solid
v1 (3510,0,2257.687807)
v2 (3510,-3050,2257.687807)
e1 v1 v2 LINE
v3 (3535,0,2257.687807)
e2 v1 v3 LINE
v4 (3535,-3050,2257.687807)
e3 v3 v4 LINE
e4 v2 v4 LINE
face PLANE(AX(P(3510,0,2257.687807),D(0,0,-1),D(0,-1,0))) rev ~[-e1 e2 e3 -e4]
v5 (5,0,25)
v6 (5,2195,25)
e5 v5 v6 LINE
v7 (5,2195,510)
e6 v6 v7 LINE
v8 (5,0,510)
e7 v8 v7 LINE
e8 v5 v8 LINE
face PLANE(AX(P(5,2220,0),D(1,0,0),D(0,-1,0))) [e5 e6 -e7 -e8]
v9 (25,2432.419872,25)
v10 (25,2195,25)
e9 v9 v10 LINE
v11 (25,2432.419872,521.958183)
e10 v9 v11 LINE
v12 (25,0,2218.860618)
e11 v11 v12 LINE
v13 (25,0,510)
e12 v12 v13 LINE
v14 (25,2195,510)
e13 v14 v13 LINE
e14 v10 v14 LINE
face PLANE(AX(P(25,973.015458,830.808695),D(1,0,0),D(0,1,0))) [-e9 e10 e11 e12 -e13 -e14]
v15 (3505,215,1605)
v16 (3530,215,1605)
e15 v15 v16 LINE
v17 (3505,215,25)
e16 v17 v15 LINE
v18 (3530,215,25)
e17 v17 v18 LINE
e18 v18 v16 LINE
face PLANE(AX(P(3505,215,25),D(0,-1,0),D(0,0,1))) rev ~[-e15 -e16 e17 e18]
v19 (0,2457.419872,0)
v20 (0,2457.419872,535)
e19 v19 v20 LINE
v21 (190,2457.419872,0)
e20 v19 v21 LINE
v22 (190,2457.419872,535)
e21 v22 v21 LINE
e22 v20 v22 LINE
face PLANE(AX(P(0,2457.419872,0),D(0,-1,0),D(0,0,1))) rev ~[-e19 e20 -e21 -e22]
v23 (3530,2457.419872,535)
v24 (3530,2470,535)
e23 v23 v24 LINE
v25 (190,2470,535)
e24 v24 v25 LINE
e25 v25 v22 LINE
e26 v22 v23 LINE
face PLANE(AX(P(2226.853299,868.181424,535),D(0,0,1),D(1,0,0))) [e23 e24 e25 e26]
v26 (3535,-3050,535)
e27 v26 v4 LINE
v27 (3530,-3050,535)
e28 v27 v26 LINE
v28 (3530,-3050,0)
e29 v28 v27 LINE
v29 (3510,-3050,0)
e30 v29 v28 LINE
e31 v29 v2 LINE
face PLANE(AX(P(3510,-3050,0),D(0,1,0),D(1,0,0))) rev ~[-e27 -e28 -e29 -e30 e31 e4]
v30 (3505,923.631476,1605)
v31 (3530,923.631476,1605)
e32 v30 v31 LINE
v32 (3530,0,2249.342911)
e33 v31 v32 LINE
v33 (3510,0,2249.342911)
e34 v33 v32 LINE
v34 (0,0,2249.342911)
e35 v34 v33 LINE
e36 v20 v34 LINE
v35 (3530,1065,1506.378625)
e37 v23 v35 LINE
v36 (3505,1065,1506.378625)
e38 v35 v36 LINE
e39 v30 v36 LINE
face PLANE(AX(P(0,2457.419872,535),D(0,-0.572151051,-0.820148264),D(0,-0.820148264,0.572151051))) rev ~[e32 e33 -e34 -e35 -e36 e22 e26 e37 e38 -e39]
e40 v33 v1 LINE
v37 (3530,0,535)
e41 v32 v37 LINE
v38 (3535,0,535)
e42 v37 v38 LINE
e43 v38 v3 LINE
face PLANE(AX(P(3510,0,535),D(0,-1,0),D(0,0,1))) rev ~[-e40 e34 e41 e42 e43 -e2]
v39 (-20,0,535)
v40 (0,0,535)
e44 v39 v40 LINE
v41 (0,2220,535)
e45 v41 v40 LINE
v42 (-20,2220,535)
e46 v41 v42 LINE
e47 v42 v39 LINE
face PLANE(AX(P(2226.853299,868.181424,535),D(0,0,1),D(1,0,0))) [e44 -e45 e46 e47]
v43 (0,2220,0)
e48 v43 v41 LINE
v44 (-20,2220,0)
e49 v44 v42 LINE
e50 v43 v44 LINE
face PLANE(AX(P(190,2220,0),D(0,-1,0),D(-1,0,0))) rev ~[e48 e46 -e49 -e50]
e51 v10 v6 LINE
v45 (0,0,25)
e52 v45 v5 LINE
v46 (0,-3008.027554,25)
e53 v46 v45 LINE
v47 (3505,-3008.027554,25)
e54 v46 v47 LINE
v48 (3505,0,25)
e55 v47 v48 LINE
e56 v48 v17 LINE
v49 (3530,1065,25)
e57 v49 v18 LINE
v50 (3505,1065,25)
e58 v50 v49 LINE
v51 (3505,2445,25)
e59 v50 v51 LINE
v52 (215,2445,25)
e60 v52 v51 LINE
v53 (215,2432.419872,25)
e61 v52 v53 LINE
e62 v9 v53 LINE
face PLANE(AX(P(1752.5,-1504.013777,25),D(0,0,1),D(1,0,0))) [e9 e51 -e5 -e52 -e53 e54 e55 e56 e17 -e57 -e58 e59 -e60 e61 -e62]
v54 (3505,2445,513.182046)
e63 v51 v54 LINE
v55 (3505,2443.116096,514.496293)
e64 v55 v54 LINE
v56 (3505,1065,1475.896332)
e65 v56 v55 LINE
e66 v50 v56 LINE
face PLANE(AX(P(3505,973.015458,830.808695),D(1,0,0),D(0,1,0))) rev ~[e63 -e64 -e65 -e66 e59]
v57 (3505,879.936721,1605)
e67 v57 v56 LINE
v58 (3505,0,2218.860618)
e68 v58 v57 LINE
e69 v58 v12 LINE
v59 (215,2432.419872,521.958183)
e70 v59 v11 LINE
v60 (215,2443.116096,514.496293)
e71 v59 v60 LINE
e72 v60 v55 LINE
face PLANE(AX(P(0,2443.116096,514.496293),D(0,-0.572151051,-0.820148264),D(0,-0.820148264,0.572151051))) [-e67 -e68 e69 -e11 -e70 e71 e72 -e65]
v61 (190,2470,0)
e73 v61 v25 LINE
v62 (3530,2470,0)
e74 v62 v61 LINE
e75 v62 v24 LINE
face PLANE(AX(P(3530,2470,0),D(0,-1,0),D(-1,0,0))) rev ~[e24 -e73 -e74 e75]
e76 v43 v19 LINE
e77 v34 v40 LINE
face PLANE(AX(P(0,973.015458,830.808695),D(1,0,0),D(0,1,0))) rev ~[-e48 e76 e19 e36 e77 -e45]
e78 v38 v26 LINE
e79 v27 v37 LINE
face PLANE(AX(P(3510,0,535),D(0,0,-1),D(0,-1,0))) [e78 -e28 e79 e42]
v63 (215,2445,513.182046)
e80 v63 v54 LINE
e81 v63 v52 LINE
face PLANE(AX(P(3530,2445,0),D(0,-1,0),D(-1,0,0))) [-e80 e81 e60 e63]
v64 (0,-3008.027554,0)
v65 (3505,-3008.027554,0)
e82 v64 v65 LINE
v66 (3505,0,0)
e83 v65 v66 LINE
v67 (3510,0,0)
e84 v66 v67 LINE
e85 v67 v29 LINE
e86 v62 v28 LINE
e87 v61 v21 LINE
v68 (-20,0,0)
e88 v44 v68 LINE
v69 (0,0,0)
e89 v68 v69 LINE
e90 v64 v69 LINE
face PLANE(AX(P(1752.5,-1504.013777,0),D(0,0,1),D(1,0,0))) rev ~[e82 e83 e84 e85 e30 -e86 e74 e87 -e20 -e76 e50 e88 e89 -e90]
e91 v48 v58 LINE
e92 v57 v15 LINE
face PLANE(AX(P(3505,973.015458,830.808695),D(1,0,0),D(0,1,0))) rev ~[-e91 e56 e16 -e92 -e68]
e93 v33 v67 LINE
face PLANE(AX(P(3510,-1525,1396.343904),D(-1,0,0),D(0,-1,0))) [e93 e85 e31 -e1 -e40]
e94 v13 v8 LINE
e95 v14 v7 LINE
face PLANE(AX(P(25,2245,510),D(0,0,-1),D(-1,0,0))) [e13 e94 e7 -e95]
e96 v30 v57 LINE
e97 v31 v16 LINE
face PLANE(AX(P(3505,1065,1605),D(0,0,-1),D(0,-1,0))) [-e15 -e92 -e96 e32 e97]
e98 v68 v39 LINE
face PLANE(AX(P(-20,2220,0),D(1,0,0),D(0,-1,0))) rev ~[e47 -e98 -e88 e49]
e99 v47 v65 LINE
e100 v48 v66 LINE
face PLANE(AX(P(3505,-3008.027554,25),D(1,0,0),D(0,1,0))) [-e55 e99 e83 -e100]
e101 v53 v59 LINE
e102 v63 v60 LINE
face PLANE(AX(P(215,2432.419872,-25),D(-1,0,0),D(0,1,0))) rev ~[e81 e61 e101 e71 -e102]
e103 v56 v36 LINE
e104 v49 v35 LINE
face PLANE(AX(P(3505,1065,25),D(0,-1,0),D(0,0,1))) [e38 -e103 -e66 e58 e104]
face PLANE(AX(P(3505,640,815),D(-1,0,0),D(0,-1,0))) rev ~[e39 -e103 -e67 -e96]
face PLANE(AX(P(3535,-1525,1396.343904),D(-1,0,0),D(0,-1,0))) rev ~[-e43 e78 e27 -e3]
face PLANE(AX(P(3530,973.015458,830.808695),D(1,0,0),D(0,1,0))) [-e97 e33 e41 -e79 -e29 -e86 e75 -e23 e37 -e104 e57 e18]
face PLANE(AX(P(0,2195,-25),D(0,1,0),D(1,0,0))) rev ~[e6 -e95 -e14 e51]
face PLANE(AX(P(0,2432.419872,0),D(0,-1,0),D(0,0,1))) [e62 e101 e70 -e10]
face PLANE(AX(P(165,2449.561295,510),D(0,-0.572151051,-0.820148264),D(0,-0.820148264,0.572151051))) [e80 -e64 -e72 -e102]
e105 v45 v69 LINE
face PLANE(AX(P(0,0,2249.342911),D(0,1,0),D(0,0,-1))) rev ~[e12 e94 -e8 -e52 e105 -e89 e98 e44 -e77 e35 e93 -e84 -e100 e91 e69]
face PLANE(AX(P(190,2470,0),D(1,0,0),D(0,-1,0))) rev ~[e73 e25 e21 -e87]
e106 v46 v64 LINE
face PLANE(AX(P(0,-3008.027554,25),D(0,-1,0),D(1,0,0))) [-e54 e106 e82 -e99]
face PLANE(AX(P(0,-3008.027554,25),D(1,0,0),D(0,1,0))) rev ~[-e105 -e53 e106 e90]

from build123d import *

# Parameters (mm, degrees)
F1_DEPTH    = 535
F3_DEPTH    = 3530
F4_T        = 25
F4_T3_DEPTH = 585
F4_T5_DEPTH = 3390
F4_T7_DEPTH = 2270
F5_W        = 3050
F5_H        = 1722.6878070831
F6_DEPTH    = 25
F7_W        = 850
F7_H        = 1580
F8_DEPTH    = 25
F9_W        = 3505
F9_H        = 3008.0275535583
F10_DEPTH   = 25


# Not quite as in the source:
# - a shell that OpenCascade refuses in one call is made with other operations: the cavity is built on its own and cut out


with BuildPart() as f1:
    # F0 (on Top) → F1 (new body)
    with BuildSketch(Plane.XY):
        Polygon((-20, 0), (0, 0), (0, 2200), (210, 2200), (210, 2450), (3510, 2450), (3510, -3050), (3530, -3050), (3530, 2470), (190, 2470), (190, 2220), (-20, 2220), align=None)
    extrude(amount=F1_DEPTH)

    # F2 (on face) → F3 (join)
    with BuildSketch(Plane.YZ):
        Polygon((0, 2249.3429109028), (0, 0), (2457.4198722839, 0), (2457.4198722839, 535), align=None)
    extrude(amount=F3_DEPTH)

    # F4: shell of thickness 25, made by hand


with BuildPart() as f4_core1:
    # F4_t2: copy of F1
    add(f1.part)

    # the walls: a layer under each face that stays
    f4_faces = [f4_core1.faces().sort_by_distance(p)[0] for p in [
        (571.6666666667, 1550, 0),
        (-10, 2220, 267.5),
        (95, 2457.4198722839, 267.5),
        (190, 2463.709936142, 267.5),
        (1860, 2463.709936142, 535),
        (1860, 2470, 267.5),
        (3520, -3050, 267.5),
        (3510, -1525, 267.5),
        (3520, -1525, 535),
        (3530, -2130, 374.8904851505),
        (1765, 1228.709936142, 1392.1714554514),
        (0, 1228.709936142, 1124.6714554514),
        (-10, 1110, 535),
        (-20, 1110, 267.5),
    ]]
    thicken(f4_faces, amount=-F4_T, mode=Mode.SUBTRACT)

    # F4_s4 → F4_t3 (cut)
    with BuildSketch(Plane.XY.offset(-25)):
        Polygon((-0.25, 2220.25), (0, 2195), (25, 2195), (25, 2220), align=None)
        Polygon((189.75, 2457.6698722839), (190, 2432.4198722839), (215, 2432.4198722839), (215, 2457.4198722839), align=None)
    extrude(amount=F4_T3_DEPTH, mode=Mode.SUBTRACT)

    # F4_s6 → F4_t5 (cut)
    with BuildSketch(Plane.YZ.offset(165)):
        Polygon((2457.5629100467, 535.455037066), (2457.4198722839, 510), (2449.5612947416, 510), (2443.1160960124, 514.4962933992), align=None)
    extrude(amount=F4_T5_DEPTH, mode=Mode.SUBTRACT)

    # F4_s8 → F4_t7 (cut)
    with BuildSketch(Plane.XZ.offset(-2245)):
        Polygon((-0.25, 535.25), (25, 535), (25, 510), (0, 510), align=None)
    extrude(amount=F4_T7_DEPTH, mode=Mode.SUBTRACT)


with BuildPart() as f1_1:
    add(f1.part)

    # what is left inside the walls is the cavity
    f4_cavity = [f4_core1.part.solids().sort_by_distance(p)[0] for p in [
        (2345, 1221.41501, 1366.473418),
    ]]
    add(f4_cavity, mode=Mode.SUBTRACT)

    # F5 (on face) → F6 (join)
    with BuildSketch(Plane(origin=(3510, 0, 0), x_dir=(0, -1, 0), z_dir=(-1, 0, 0))):
        with Locations((1525, 1396.3439035416)):
            Rectangle(F5_W, F5_H)
    extrude(amount=-F6_DEPTH)

    # F7 (on face) → F8 (cut)
    with BuildSketch(Plane(origin=(3505, 0, 0), x_dir=(0, -1, 0), z_dir=(-1, 0, 0))):
        with Locations((-640, 815)):
            Rectangle(F7_W, F7_H)
    extrude(amount=-F8_DEPTH, mode=Mode.SUBTRACT)

    # F9 (on face) → F10 (join)
    with BuildSketch(Plane.XY.offset(25)):
        with Locations((1752.5, -1504.0137767792)):
            Rectangle(F9_W, F9_H)
    extrude(amount=-F10_DEPTH)


solid = f1_1.part
